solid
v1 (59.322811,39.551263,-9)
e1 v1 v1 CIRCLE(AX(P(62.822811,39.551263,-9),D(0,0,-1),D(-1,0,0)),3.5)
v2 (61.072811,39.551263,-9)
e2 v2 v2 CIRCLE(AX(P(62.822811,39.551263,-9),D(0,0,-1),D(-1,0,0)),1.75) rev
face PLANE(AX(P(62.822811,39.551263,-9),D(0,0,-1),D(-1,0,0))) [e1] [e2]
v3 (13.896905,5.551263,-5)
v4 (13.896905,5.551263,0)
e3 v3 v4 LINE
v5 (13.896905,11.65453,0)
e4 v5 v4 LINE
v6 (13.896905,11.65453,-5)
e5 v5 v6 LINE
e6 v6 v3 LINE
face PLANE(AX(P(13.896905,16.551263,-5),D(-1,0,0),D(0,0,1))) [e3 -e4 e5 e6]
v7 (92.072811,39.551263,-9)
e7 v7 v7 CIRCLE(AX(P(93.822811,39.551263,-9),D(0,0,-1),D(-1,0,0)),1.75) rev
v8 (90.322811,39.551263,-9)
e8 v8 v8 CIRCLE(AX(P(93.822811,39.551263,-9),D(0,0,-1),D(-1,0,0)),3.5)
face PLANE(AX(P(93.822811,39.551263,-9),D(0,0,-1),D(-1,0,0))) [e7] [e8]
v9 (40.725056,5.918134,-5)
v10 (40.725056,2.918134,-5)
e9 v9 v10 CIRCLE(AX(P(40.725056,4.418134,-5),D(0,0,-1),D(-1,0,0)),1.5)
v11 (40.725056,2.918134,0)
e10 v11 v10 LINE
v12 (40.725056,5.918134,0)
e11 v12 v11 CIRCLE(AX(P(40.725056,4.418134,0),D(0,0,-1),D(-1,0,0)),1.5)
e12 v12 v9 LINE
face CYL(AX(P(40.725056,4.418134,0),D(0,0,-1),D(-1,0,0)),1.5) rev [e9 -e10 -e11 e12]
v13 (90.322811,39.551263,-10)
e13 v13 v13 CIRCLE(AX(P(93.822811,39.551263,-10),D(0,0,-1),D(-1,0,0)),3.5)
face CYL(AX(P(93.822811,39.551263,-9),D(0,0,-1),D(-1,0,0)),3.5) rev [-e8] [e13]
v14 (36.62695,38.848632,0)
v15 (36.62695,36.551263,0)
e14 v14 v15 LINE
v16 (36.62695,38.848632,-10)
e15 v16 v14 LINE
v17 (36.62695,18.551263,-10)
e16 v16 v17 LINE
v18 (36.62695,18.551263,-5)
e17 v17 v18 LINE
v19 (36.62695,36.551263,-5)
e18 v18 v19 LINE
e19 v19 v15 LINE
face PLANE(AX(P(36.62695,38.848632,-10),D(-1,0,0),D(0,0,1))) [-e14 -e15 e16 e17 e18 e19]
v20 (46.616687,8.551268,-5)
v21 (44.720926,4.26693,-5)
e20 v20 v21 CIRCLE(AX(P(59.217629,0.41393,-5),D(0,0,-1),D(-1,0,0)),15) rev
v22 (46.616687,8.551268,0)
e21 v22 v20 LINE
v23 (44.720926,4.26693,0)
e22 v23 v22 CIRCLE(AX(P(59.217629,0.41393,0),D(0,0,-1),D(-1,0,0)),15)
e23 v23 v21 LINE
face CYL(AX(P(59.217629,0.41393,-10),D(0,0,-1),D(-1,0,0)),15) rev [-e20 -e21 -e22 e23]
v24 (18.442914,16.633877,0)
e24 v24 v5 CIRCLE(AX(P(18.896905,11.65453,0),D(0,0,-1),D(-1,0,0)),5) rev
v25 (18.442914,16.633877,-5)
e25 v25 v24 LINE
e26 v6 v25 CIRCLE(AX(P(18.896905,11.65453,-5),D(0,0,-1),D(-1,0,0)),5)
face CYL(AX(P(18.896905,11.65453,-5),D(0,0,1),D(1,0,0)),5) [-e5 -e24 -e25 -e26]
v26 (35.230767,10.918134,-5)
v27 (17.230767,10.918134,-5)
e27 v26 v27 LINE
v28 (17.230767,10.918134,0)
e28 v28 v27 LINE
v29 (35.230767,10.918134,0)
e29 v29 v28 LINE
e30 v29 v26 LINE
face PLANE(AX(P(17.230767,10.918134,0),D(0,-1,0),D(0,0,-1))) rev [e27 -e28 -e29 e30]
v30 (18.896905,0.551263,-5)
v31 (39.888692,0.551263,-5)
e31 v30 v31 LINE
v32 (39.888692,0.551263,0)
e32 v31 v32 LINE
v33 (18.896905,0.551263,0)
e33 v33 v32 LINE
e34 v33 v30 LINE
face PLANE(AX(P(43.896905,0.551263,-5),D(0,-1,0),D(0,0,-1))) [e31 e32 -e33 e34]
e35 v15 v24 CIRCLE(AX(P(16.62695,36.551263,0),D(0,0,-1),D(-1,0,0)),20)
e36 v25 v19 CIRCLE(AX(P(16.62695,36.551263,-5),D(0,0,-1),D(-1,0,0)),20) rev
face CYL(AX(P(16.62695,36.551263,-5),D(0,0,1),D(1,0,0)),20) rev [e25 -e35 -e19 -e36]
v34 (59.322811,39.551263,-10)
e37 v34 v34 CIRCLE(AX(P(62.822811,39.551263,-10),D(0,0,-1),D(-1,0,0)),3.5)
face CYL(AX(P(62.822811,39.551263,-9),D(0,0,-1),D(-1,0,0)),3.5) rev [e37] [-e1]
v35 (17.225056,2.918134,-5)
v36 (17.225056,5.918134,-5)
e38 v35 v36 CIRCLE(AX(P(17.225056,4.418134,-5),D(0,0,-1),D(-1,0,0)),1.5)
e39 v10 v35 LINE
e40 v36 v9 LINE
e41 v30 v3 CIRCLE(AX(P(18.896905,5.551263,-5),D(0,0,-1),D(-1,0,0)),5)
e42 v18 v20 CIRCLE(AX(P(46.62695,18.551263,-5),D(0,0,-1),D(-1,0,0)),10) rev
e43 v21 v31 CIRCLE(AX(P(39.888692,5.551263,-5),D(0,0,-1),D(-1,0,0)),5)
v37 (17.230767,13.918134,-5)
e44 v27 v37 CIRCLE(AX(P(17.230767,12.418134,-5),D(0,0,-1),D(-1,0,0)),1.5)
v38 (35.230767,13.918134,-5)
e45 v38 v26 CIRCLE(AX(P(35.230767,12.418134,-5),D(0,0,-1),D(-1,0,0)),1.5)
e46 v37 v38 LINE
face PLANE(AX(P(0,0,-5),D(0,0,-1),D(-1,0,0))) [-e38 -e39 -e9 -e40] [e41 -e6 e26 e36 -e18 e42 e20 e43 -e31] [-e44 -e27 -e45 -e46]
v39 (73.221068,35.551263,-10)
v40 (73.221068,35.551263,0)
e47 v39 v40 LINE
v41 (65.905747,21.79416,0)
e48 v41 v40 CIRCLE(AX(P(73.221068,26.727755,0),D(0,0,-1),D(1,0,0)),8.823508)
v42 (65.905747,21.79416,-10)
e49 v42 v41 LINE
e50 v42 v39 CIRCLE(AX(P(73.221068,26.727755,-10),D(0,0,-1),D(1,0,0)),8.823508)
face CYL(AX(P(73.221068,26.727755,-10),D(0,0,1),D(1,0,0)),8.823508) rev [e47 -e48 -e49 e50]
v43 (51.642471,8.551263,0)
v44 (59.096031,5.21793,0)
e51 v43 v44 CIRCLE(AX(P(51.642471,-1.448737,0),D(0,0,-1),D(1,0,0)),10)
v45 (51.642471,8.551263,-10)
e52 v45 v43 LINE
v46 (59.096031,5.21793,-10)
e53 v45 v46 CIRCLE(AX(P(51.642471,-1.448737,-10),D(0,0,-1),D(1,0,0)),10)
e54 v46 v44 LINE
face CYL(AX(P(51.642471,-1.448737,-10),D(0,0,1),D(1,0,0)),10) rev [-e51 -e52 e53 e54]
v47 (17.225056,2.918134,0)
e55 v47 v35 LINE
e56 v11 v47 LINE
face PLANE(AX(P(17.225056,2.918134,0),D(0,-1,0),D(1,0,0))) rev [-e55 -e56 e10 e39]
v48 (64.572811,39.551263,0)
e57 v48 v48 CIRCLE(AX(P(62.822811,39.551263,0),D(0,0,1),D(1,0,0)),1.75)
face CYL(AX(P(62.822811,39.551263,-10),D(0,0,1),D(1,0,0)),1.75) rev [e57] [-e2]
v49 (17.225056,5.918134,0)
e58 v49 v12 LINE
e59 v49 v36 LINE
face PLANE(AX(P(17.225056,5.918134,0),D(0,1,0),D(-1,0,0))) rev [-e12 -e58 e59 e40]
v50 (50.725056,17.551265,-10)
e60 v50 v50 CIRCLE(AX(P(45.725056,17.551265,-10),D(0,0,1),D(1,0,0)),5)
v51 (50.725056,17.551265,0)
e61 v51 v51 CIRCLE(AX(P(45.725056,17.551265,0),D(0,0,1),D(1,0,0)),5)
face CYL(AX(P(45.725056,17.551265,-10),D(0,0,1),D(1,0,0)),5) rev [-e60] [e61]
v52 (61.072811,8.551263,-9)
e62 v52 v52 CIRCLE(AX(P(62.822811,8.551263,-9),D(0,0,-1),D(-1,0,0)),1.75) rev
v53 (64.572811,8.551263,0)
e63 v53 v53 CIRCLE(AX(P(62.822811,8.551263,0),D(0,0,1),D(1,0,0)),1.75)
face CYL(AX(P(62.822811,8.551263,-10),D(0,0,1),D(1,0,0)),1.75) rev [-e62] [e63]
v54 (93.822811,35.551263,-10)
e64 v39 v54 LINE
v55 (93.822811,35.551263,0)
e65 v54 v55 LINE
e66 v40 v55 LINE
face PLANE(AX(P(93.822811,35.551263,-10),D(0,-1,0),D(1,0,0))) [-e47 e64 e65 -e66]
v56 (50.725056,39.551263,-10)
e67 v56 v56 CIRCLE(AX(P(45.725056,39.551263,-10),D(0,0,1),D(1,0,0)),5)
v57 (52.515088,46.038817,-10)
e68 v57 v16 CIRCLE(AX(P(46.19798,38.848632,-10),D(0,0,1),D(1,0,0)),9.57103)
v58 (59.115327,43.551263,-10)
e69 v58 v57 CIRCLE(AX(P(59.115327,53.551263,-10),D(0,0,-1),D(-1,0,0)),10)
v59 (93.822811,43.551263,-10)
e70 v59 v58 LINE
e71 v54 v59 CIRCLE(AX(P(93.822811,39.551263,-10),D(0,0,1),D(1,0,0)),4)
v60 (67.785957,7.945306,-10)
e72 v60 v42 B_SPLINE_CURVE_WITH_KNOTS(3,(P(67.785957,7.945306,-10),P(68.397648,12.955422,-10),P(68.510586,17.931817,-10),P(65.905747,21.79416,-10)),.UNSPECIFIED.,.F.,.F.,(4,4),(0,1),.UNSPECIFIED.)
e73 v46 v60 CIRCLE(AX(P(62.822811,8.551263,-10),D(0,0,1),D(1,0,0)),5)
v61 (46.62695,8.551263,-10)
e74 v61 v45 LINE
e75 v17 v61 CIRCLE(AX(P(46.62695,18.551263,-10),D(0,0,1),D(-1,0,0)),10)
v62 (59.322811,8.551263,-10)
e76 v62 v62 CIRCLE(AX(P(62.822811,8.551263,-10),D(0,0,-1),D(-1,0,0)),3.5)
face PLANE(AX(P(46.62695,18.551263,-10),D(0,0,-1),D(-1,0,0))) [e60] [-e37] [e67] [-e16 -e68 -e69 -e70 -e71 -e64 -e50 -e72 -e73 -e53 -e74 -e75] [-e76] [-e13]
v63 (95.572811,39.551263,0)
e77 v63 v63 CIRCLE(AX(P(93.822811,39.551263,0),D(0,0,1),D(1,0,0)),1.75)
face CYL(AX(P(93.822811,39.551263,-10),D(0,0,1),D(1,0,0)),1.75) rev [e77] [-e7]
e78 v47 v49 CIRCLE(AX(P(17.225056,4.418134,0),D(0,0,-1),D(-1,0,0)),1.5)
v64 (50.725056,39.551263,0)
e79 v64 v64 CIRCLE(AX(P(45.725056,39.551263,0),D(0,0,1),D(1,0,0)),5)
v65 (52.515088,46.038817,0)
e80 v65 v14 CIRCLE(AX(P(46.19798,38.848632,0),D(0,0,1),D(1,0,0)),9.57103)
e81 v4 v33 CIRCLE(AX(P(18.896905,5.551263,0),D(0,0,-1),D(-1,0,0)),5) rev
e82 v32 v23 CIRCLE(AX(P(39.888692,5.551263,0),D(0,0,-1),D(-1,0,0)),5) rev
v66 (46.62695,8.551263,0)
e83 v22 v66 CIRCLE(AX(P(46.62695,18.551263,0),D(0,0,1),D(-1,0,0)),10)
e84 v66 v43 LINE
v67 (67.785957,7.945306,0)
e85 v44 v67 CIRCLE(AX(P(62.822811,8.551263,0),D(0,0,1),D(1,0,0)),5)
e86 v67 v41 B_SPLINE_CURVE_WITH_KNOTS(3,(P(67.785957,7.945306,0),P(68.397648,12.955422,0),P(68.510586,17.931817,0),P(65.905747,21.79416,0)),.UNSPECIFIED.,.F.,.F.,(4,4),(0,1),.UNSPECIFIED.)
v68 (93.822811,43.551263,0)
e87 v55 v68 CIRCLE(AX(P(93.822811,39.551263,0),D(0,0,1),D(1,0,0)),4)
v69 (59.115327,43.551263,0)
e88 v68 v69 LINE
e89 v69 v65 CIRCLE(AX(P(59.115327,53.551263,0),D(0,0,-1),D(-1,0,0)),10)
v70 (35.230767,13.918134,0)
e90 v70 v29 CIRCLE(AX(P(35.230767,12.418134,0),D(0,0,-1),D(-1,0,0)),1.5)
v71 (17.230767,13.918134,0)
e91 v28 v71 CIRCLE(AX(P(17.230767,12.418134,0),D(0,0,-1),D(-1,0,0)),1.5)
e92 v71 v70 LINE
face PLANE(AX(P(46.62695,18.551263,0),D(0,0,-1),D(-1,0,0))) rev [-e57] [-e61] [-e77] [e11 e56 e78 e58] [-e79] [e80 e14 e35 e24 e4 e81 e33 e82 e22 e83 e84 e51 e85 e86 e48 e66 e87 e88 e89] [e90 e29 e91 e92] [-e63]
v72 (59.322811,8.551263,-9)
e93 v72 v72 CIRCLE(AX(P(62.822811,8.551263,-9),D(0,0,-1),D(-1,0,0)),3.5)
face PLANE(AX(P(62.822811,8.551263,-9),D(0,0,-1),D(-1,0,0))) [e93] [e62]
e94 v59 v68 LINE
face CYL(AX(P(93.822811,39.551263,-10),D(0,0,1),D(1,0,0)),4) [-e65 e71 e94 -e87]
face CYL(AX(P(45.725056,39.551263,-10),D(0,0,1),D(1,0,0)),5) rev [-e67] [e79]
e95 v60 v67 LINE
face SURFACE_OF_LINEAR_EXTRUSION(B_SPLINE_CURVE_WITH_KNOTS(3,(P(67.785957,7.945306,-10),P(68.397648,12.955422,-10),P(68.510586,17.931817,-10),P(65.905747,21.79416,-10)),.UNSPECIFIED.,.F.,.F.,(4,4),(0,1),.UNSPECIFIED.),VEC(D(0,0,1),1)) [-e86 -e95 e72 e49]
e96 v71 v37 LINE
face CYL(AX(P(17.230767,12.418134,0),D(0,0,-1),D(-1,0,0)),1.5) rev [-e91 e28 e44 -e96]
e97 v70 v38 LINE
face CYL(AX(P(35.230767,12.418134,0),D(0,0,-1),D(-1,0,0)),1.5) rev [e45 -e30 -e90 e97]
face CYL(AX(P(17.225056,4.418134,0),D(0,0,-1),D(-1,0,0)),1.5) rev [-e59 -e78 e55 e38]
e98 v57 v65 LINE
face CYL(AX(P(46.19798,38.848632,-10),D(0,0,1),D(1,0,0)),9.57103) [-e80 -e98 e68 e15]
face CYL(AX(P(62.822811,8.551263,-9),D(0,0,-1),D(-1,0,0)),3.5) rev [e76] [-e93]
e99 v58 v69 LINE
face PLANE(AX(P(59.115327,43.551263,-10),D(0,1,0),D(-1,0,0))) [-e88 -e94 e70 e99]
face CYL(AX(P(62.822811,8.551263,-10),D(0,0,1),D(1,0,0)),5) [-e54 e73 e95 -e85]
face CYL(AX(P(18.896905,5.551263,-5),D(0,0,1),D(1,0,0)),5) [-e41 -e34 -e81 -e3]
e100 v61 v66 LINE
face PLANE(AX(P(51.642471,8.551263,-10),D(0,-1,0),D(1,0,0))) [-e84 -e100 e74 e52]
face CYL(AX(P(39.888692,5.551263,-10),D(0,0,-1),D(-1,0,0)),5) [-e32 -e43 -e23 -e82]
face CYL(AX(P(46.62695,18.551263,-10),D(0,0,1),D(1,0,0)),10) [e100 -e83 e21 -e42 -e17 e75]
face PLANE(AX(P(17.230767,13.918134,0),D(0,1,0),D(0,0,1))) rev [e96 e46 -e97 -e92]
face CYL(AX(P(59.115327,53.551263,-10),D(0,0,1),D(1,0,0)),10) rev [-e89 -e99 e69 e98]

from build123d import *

# Parameters (mm, degrees)
SKETCH1_R           = 1.75
SKETCH1_R_2         = 5
BOSS_EXTRUDE1_DEPTH = 10
EXTRUDE1_DEPTH      = 5
FILLET2_R           = 20
FILLET3_R           = 5
FILLET5_R           = 5
EXTRUDE2_DEPTH      = 5
FILLET7_R           = 475
FILLET8_R           = 15
FILLET9_R           = 5
SKETCH4_R           = 3.5
EXTRUDE3_DEPTH      = 1


with BuildPart() as part:
    # Sketch1 → Boss-Extrude1 (new body)
    with BuildSketch(Plane.XY):
        with BuildLine():
            Line((59.115327383, 43.551262968), (93.822811009, 43.551262968))
            ThreePointArc((93.822811009, 43.551262968), (97.822811009, 39.551262968), (93.822811009, 35.551262968))
            Line((93.822811009, 35.551262968), (73.221068218, 35.551262968))
            ThreePointArc((73.221068218, 35.551262968), (65.430500205, 30.870379763), (65.905746743, 21.794160382))
            add(Edge.make_bspline(
                [(65.905746743, 21.794160382), (68.510586107, 17.931817085), (68.397648351, 12.955422289), (67.785956814, 7.945306105)],
                knots=[0, 0, 0, 0, 1, 1, 1, 1], degree=3))
            ThreePointArc((67.785956814, 7.945306105), (67.117243875, 5.990433735), (65.715264602, 4.47281814))
            ThreePointArc((65.715264602, 4.47281814), (62.263505272, 3.582643734), (59.096031047, 5.217929635))
            ThreePointArc((59.096031047, 5.217929635), (55.724954026, 7.67997226), (51.642471122, 8.551262968))
            Line((51.642471122, 8.551262968), (46.626949913, 8.551262968))
            ThreePointArc((46.626949913, 8.551262968), (39.555882101, 11.480195156), (36.626949913, 18.551262968))
            Line((36.626949913, 18.551262968), (36.626949913, 38.848632096))
            ThreePointArc((36.626949913, 38.848632096), (42.251881835, 47.568318218), (52.515088487, 46.03881686))
            ThreePointArc((52.515088487, 46.03881686), (55.588605185, 44.19379373), (59.115327383, 43.551262968))
        make_face()
        with Locations((93.822811009, 39.551262968)):
            Circle(SKETCH1_R, mode=Mode.SUBTRACT)
        with Locations((62.822811009, 39.551262968)):
            Circle(SKETCH1_R, mode=Mode.SUBTRACT)
        with Locations((62.822811009, 8.551262968)):
            Circle(SKETCH1_R, mode=Mode.SUBTRACT)
        with Locations((45.725055781, 39.551262968)):
            Circle(SKETCH1_R_2, mode=Mode.SUBTRACT)
        with Locations((45.725055781, 17.551264875)):
            Circle(SKETCH1_R_2, mode=Mode.SUBTRACT)
    extrude(amount=-BOSS_EXTRUDE1_DEPTH)

    # Sketch2 → Extrude1 (add)
    with BuildSketch(Plane.XY):
        Polygon((45.636633265, 8.551262968), (43.896905309, 0.551262968), (13.896905309, 0.551262968), (13.896905309, 16.551262968), (39.149006125, 16.551262968), (41.006428166, 12.551262968), (45.636633265, 10.857586925), align=None)
    extrude(amount=-EXTRUDE1_DEPTH)

    # Fillet2
    # the kernel refuses this fillet: 20 mm, written as the material it adds along each edge
    with BuildSketch(Plane(origin=(36.828990942, 16.551262968, -5), x_dir=(-0.010101536018348446, 0.9999489781834221, 0), z_dir=(0, 0, 1))) as fillet2_piece_1:
        with BuildLine():
            CenterArc((20.203051209, 19.998979564), FILLET2_R, 179.421214776, 90)
            Line((0.204071645, 20.201010284), (-1.795826311, 20.221213356))
            Line((-1.795826311, 20.221213356), (-1.999897956, 0.020203072))
            Line((-1.999897956, 0.020203072), (0.380184704, -1.963532427))
            ThreePointArc((0.380184704, -1.963532427), (1.981735809, -1.818070308), (19.980817416, -1.999897956))
            Line((19.980817416, -1.999897956), (20.001020488, 0))
        make_face()
    extrude(amount=5)

    # Fillet3
    fillet3_edges = [part.edges().sort_by_distance(p)[0] for p in [
        (13.896905309, 16.551262968, -2.5),
    ]]
    fillet(fillet3_edges, radius=FILLET3_R)

    # Fillet5
    fillet5_edges = [part.edges().sort_by_distance(p)[0] for p in [
        (13.896905309, 0.551262968, -2.5),
    ]]
    fillet(fillet5_edges, radius=FILLET5_R)

    # Sketch3 → Extrude2 (cut)
    with BuildSketch(Plane(origin=(0, 0, -5), x_dir=(-1, 0, 0), z_dir=(0, 0, -1))):
        with BuildLine():
            Line((-17.230767467, 10.918134064), (-35.230767467, 10.918134064))
            ThreePointArc((-35.230767467, 10.918134064), (-36.730767467, 12.418134064), (-35.230767467, 13.918134064))
            Line((-35.230767467, 13.918134064), (-17.230767467, 13.918134064))
            ThreePointArc((-17.230767467, 13.918134064), (-15.730767467, 12.418134064), (-17.230767467, 10.918134064))
        make_face()
        with BuildLine():
            Line((-17.225055781, 2.918134064), (-40.725055781, 2.918134064))
            ThreePointArc((-40.725055781, 2.918134064), (-42.225055781, 4.418134064), (-40.725055781, 5.918134064))
            Line((-40.725055781, 5.918134064), (-17.225055781, 5.918134064))
            ThreePointArc((-17.225055781, 5.918134064), (-15.725055781, 4.418134064), (-17.225055781, 2.918134064))
        make_face()
    extrude(amount=-EXTRUDE2_DEPTH, mode=Mode.SUBTRACT)

    # Fillet7
    # the kernel refuses this fillet: 475 mm, written as the material it adds along each edge
    with BuildSketch(Plane(origin=(45.636633265, 8.600420143, -5), x_dir=(0, -1, 0), z_dir=(0, 0, 1))) as fillet7_piece_1:
        with BuildLine():
            CenterArc((475.04890177, 0.492579304), FILLET7_R, 179.941199476, 0.118216777)
            ThreePointArc((0.049151908, 0.980054022), (0.036604611, 0.489423747), (0, 0))
            Line((0, 0), (0.049157175, 0))
        make_face()
    extrude(amount=5)

    # Fillet8
    # the kernel refuses this fillet: 15 mm, written as the material it adds along each edge
    with BuildSketch(Plane(origin=(45.636633265, 8.551262968, 0), x_dir=(0.999999999985564, 5.37325013854713e-06, 0), z_dir=(0, 0, -1))) as fillet8_piece_1:
        with BuildLine():
            CenterArc((13.580951994, 8.137405625), FILLET8_R, 192.269167845, 20.584390422)
            Line((-1.076449047, 4.949836848), (0, 0))
            ThreePointArc((0, 0), (0.490027011, -0.000252765), (0.980054022, 0))
        make_face()
    extrude(amount=5)

    # Fillet9
    fillet9_edges = [part.edges().sort_by_distance(p)[0] for p in [
        (43.896905309, 0.551262968, -2.5),
    ]]
    fillet(fillet9_edges, radius=FILLET9_R)

    # Sketch4 → Extrude3 (cut)
    with BuildSketch(Plane(origin=(0, 0, -10), x_dir=(-1, 0, 0), z_dir=(0, 0, -1))):
        with Locations((-62.822811009, 39.551262968)):
            Circle(SKETCH4_R)
        with Locations((-93.822811009, 39.551262968)):
            Circle(SKETCH4_R)
        with Locations((-62.822811009, 8.551262968)):
            Circle(SKETCH4_R)
    extrude(amount=-EXTRUDE3_DEPTH, mode=Mode.SUBTRACT)


solid = part.part
